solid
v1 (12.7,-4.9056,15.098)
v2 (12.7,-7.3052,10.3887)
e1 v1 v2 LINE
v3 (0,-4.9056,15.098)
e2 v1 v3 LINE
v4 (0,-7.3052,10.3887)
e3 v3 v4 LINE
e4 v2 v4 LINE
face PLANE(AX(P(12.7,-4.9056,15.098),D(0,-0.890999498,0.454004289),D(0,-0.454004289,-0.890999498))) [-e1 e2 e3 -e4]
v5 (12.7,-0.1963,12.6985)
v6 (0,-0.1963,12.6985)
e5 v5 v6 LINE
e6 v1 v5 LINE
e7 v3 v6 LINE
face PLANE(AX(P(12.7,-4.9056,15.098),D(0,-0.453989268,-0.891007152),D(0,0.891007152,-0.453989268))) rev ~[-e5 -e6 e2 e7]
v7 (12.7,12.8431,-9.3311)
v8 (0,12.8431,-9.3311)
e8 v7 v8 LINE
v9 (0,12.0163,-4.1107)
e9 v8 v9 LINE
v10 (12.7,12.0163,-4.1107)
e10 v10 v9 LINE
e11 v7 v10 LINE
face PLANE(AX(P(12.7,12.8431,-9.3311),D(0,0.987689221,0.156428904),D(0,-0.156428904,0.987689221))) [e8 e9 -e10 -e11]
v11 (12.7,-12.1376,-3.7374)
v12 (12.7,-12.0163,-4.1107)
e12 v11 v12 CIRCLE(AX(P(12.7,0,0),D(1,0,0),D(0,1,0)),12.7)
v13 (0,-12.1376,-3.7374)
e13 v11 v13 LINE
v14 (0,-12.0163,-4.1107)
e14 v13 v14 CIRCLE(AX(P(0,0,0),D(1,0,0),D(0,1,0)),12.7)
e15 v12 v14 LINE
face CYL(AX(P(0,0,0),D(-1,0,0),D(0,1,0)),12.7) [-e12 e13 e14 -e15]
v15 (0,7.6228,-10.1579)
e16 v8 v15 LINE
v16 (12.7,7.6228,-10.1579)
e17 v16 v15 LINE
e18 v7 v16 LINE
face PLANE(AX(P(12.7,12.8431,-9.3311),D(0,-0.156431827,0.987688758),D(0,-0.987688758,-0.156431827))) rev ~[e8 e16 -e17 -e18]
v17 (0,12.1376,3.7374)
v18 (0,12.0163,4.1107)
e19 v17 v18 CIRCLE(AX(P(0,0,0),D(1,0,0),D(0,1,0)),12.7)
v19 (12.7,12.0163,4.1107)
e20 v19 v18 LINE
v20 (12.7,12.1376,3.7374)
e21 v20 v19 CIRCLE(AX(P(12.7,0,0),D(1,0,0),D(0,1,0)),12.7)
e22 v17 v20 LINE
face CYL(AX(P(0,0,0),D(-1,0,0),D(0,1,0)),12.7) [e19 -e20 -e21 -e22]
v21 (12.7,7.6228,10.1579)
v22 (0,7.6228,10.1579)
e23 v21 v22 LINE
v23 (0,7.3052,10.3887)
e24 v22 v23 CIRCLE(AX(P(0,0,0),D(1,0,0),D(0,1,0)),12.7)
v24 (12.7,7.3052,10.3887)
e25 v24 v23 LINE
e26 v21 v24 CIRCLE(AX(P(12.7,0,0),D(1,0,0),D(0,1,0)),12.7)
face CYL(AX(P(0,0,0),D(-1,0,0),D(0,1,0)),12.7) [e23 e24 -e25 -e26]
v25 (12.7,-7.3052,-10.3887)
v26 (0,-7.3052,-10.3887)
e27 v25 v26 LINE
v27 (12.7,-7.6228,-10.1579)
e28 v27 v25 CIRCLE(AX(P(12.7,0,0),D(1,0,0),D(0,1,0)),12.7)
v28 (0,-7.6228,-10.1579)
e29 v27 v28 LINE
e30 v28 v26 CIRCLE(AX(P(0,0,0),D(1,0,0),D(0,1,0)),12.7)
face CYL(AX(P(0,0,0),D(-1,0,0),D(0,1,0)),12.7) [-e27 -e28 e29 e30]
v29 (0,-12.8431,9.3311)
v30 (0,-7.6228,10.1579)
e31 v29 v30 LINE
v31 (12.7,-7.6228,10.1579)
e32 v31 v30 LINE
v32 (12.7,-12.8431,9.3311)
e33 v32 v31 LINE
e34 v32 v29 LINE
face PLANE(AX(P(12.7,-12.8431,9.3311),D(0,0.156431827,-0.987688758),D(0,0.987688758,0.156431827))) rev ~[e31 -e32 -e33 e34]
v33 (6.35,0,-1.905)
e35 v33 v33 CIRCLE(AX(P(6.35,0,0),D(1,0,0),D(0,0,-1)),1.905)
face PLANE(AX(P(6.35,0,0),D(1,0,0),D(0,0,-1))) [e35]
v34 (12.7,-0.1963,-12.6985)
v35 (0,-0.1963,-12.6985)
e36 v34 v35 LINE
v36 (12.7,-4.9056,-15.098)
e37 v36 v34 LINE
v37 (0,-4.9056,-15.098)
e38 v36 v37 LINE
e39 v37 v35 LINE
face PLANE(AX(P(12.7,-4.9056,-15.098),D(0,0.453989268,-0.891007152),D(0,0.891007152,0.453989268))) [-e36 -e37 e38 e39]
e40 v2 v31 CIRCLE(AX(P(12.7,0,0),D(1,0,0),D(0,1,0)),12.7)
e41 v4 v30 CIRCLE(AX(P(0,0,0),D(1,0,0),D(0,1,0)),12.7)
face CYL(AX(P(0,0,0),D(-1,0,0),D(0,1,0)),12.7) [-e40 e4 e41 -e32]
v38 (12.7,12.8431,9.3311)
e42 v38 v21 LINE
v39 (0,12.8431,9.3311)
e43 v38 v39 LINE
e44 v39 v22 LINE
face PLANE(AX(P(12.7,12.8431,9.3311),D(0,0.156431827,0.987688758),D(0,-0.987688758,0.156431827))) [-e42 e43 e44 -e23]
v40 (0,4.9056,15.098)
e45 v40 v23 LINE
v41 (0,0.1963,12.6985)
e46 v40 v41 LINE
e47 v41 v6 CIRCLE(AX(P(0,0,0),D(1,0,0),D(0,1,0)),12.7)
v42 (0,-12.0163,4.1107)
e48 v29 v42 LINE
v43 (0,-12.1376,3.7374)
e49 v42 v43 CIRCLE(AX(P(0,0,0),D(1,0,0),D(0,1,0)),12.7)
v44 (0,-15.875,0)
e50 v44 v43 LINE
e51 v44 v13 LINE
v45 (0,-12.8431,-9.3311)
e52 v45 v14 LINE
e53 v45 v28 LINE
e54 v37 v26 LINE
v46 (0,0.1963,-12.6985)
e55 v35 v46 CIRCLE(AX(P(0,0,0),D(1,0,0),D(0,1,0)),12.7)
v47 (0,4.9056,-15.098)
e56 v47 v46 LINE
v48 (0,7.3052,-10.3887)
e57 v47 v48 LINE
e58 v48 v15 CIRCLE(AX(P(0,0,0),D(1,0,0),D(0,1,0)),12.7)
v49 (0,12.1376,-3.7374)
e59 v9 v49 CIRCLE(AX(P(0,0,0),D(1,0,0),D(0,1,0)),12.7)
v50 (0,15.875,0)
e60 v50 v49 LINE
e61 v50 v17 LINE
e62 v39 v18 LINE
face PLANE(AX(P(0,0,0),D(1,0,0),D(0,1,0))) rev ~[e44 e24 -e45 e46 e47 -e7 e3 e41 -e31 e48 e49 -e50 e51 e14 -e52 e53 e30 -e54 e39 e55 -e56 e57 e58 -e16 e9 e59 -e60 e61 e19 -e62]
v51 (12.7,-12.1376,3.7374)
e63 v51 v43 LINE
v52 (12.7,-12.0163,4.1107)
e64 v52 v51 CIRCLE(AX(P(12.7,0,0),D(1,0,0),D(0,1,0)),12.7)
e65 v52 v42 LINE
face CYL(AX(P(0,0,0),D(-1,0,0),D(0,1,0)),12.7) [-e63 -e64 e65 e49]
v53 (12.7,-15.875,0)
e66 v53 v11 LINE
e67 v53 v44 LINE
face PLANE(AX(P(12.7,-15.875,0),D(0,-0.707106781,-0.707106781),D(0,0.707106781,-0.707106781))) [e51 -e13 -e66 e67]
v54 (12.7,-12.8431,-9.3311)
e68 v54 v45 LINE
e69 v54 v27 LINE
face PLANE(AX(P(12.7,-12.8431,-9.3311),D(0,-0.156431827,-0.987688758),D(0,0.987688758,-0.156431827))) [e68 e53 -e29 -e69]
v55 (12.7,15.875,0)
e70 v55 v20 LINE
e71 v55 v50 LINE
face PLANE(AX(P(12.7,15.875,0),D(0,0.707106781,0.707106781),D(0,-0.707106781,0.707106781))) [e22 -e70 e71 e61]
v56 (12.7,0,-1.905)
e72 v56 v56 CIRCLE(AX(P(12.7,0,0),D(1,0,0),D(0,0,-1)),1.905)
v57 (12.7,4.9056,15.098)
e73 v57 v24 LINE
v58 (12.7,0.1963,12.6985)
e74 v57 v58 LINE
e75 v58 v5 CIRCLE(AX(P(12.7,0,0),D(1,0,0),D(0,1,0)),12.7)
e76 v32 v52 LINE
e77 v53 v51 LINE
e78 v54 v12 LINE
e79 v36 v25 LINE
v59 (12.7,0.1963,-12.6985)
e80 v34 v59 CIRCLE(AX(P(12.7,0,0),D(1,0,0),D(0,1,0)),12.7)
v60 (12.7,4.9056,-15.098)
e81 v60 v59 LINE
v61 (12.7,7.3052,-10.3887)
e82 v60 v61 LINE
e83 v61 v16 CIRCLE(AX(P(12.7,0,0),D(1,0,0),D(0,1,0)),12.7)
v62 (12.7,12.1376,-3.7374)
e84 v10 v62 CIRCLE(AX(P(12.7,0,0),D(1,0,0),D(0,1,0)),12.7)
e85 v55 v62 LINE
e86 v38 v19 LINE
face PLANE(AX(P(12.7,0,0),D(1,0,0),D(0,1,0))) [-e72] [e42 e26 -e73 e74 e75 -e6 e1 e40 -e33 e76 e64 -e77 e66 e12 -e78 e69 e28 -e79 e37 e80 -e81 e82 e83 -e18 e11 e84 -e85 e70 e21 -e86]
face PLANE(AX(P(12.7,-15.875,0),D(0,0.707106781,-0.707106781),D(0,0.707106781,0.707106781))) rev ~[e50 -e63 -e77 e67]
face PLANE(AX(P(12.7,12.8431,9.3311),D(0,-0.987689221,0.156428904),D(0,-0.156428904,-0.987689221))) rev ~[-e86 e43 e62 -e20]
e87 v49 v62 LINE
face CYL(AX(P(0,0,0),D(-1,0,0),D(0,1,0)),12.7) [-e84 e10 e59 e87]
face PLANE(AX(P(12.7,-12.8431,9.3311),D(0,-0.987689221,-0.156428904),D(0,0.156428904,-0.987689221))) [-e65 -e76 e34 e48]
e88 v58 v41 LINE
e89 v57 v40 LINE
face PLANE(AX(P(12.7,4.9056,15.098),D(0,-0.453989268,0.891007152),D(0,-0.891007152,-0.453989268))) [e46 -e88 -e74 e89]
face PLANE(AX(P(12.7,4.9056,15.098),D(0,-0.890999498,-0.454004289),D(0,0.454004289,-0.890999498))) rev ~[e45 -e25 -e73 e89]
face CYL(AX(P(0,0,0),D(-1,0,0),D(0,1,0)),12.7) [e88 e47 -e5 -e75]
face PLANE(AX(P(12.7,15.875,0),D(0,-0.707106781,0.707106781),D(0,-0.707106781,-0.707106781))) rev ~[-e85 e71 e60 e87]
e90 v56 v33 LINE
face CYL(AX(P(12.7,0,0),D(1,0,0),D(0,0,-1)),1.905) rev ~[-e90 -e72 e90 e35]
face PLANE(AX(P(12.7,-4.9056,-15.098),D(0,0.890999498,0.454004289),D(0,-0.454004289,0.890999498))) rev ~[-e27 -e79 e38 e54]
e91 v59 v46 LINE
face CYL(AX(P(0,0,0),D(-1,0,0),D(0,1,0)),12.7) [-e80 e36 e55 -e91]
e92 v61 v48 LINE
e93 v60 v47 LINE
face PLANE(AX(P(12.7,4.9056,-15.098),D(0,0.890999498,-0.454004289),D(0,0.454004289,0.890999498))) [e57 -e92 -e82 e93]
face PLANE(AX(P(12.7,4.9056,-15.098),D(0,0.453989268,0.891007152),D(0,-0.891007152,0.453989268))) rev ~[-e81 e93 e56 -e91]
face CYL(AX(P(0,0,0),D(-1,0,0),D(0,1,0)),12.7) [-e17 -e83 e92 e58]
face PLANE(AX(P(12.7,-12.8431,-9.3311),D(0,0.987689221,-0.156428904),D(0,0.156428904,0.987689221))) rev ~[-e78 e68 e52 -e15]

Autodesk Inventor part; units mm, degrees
ref_plane "YZ Plane" through (0, 0, 0) normal (1, 0, 0) x (0, 1, 0)
ref_plane "XZ Plane" through (0, 0, 0) normal (0, 1, 0) x (-1, 0, 0)
ref_plane "XY Plane" through (0, 0, 0) normal (0, 0, 1) x (1, 0, 0)
sketch "Sketch1" plane through (0, 0, 0) normal (1, 0, 0) x (0, 1, 0)
  circle A0 centre (0, 0) radius 12.7
  arc A1 (12.1376, -3.7374) -> (12.1376, 3.7374) centre (0, 0) ccw
  dimension "d0" = 25.4
extrude "Extrusion1" add sketch "Sketch1" along normal blind 12.7
sketch "Sketch2" plane through (12.7, 0, 0) normal (1, 0, 0) x (0, 0, -1)
  circle A0 centre (0, 0) radius 12.7 construction
  line L0 (0, 12.7) -> (3.175, 12.7) construction
  line L1 (0, 12.7) -> (-3.175, 12.7) construction
  line L2 (-3.175, 12.7) -> (0, 15.875) construction
  line L3 (0, 15.875) -> (3.175, 12.7) construction
  line L4 (0, 15.875) -> (-3.7374, 12.1376)
  line L5 (0, 15.875) -> (3.7374, 12.1376)
  arc A1 (3.7374, 12.1376) -> (-3.7374, 12.1376) centre (0, 0) ccw
  line L6 (-9.3311, 12.8431) -> (-10.1579, 7.6228)
  line L7 (-9.3311, 12.8431) -> (-4.1107, 12.0163)
  arc A2 (-4.1107, 12.0163) -> (-10.1579, 7.6228) centre (0, 0) ccw
  line L8 (-15.098, 4.9056) -> (-12.6985, 0.1963)
  line L9 (-15.098, 4.9056) -> (-10.3887, 7.3052)
  arc A3 (-10.3887, 7.3052) -> (-12.6985, 0.1963) centre (0, 0) ccw
  line L10 (-15.098, -4.9056) -> (-10.3887, -7.3052)
  line L11 (-15.098, -4.9056) -> (-12.6985, -0.1963)
  arc A4 (-12.6985, -0.1963) -> (-10.3887, -7.3052) centre (0, 0) ccw
  line L12 (-9.3311, -12.8431) -> (-4.1107, -12.0163)
  line L13 (-9.3311, -12.8431) -> (-10.1579, -7.6228)
  arc A5 (-10.1579, -7.6228) -> (-4.1107, -12.0163) centre (0, 0) ccw
  line L14 (0, -15.875) -> (3.7374, -12.1376)
  line L15 (0, -15.875) -> (-3.7374, -12.1376)
  arc A6 (-3.7374, -12.1376) -> (3.7374, -12.1376) centre (0, 0) ccw
  line L16 (9.3311, -12.8431) -> (10.1579, -7.6228)
  line L17 (9.3311, -12.8431) -> (4.1107, -12.0163)
  arc A7 (4.1107, -12.0163) -> (10.1579, -7.6228) centre (0, 0) ccw
  line L18 (15.098, -4.9056) -> (12.6985, -0.1963)
  line L19 (15.098, -4.9056) -> (10.3887, -7.3052)
  arc A8 (10.3887, -7.3052) -> (12.6985, -0.1963) centre (0, 0) ccw
  line L20 (15.098, 4.9056) -> (10.3887, 7.3052)
  line L21 (15.098, 4.9056) -> (12.6985, 0.1963)
  arc A9 (12.6985, 0.1963) -> (10.3887, 7.3052) centre (0, 0) ccw
  line L22 (9.3311, 12.8431) -> (4.1107, 12.0163)
  line L23 (9.3311, 12.8431) -> (10.1579, 7.6228)
  arc A10 (10.1579, 7.6228) -> (4.1107, 12.0163) centre (0, 0) ccw
  point P0 (-7.4649, 10.2745)
  point P1 (-12.0784, 3.9245)
  point P2 (-12.0784, -3.9245)
  point P3 (-7.4649, -10.2745)
  point P4 (0, -12.7)
  point P5 (7.4649, -10.2745)
  point P6 (12.0784, -3.9245)
  point P7 (12.0784, 3.9245)
  point P8 (7.4649, 10.2745)
  dimension "d6" = 3.175
  dimension "d7" = 3.175
  dimension "d8" = 45
  dimension "d11" = 360
extrude "Extrusion2" add sketch "Sketch2" against normal blind 12.7
sketch "Sketch3" plane through (12.7, 0, 0) normal (1, 0, 0) x (0, 0, -1)
  circle A0 centre (0, 0) radius 1.905
  dimension "d15" = 3.81
extrude "Extrusion3" cut sketch "Sketch3" against normal blind 6.35
properties part number "Finger Pinion"
